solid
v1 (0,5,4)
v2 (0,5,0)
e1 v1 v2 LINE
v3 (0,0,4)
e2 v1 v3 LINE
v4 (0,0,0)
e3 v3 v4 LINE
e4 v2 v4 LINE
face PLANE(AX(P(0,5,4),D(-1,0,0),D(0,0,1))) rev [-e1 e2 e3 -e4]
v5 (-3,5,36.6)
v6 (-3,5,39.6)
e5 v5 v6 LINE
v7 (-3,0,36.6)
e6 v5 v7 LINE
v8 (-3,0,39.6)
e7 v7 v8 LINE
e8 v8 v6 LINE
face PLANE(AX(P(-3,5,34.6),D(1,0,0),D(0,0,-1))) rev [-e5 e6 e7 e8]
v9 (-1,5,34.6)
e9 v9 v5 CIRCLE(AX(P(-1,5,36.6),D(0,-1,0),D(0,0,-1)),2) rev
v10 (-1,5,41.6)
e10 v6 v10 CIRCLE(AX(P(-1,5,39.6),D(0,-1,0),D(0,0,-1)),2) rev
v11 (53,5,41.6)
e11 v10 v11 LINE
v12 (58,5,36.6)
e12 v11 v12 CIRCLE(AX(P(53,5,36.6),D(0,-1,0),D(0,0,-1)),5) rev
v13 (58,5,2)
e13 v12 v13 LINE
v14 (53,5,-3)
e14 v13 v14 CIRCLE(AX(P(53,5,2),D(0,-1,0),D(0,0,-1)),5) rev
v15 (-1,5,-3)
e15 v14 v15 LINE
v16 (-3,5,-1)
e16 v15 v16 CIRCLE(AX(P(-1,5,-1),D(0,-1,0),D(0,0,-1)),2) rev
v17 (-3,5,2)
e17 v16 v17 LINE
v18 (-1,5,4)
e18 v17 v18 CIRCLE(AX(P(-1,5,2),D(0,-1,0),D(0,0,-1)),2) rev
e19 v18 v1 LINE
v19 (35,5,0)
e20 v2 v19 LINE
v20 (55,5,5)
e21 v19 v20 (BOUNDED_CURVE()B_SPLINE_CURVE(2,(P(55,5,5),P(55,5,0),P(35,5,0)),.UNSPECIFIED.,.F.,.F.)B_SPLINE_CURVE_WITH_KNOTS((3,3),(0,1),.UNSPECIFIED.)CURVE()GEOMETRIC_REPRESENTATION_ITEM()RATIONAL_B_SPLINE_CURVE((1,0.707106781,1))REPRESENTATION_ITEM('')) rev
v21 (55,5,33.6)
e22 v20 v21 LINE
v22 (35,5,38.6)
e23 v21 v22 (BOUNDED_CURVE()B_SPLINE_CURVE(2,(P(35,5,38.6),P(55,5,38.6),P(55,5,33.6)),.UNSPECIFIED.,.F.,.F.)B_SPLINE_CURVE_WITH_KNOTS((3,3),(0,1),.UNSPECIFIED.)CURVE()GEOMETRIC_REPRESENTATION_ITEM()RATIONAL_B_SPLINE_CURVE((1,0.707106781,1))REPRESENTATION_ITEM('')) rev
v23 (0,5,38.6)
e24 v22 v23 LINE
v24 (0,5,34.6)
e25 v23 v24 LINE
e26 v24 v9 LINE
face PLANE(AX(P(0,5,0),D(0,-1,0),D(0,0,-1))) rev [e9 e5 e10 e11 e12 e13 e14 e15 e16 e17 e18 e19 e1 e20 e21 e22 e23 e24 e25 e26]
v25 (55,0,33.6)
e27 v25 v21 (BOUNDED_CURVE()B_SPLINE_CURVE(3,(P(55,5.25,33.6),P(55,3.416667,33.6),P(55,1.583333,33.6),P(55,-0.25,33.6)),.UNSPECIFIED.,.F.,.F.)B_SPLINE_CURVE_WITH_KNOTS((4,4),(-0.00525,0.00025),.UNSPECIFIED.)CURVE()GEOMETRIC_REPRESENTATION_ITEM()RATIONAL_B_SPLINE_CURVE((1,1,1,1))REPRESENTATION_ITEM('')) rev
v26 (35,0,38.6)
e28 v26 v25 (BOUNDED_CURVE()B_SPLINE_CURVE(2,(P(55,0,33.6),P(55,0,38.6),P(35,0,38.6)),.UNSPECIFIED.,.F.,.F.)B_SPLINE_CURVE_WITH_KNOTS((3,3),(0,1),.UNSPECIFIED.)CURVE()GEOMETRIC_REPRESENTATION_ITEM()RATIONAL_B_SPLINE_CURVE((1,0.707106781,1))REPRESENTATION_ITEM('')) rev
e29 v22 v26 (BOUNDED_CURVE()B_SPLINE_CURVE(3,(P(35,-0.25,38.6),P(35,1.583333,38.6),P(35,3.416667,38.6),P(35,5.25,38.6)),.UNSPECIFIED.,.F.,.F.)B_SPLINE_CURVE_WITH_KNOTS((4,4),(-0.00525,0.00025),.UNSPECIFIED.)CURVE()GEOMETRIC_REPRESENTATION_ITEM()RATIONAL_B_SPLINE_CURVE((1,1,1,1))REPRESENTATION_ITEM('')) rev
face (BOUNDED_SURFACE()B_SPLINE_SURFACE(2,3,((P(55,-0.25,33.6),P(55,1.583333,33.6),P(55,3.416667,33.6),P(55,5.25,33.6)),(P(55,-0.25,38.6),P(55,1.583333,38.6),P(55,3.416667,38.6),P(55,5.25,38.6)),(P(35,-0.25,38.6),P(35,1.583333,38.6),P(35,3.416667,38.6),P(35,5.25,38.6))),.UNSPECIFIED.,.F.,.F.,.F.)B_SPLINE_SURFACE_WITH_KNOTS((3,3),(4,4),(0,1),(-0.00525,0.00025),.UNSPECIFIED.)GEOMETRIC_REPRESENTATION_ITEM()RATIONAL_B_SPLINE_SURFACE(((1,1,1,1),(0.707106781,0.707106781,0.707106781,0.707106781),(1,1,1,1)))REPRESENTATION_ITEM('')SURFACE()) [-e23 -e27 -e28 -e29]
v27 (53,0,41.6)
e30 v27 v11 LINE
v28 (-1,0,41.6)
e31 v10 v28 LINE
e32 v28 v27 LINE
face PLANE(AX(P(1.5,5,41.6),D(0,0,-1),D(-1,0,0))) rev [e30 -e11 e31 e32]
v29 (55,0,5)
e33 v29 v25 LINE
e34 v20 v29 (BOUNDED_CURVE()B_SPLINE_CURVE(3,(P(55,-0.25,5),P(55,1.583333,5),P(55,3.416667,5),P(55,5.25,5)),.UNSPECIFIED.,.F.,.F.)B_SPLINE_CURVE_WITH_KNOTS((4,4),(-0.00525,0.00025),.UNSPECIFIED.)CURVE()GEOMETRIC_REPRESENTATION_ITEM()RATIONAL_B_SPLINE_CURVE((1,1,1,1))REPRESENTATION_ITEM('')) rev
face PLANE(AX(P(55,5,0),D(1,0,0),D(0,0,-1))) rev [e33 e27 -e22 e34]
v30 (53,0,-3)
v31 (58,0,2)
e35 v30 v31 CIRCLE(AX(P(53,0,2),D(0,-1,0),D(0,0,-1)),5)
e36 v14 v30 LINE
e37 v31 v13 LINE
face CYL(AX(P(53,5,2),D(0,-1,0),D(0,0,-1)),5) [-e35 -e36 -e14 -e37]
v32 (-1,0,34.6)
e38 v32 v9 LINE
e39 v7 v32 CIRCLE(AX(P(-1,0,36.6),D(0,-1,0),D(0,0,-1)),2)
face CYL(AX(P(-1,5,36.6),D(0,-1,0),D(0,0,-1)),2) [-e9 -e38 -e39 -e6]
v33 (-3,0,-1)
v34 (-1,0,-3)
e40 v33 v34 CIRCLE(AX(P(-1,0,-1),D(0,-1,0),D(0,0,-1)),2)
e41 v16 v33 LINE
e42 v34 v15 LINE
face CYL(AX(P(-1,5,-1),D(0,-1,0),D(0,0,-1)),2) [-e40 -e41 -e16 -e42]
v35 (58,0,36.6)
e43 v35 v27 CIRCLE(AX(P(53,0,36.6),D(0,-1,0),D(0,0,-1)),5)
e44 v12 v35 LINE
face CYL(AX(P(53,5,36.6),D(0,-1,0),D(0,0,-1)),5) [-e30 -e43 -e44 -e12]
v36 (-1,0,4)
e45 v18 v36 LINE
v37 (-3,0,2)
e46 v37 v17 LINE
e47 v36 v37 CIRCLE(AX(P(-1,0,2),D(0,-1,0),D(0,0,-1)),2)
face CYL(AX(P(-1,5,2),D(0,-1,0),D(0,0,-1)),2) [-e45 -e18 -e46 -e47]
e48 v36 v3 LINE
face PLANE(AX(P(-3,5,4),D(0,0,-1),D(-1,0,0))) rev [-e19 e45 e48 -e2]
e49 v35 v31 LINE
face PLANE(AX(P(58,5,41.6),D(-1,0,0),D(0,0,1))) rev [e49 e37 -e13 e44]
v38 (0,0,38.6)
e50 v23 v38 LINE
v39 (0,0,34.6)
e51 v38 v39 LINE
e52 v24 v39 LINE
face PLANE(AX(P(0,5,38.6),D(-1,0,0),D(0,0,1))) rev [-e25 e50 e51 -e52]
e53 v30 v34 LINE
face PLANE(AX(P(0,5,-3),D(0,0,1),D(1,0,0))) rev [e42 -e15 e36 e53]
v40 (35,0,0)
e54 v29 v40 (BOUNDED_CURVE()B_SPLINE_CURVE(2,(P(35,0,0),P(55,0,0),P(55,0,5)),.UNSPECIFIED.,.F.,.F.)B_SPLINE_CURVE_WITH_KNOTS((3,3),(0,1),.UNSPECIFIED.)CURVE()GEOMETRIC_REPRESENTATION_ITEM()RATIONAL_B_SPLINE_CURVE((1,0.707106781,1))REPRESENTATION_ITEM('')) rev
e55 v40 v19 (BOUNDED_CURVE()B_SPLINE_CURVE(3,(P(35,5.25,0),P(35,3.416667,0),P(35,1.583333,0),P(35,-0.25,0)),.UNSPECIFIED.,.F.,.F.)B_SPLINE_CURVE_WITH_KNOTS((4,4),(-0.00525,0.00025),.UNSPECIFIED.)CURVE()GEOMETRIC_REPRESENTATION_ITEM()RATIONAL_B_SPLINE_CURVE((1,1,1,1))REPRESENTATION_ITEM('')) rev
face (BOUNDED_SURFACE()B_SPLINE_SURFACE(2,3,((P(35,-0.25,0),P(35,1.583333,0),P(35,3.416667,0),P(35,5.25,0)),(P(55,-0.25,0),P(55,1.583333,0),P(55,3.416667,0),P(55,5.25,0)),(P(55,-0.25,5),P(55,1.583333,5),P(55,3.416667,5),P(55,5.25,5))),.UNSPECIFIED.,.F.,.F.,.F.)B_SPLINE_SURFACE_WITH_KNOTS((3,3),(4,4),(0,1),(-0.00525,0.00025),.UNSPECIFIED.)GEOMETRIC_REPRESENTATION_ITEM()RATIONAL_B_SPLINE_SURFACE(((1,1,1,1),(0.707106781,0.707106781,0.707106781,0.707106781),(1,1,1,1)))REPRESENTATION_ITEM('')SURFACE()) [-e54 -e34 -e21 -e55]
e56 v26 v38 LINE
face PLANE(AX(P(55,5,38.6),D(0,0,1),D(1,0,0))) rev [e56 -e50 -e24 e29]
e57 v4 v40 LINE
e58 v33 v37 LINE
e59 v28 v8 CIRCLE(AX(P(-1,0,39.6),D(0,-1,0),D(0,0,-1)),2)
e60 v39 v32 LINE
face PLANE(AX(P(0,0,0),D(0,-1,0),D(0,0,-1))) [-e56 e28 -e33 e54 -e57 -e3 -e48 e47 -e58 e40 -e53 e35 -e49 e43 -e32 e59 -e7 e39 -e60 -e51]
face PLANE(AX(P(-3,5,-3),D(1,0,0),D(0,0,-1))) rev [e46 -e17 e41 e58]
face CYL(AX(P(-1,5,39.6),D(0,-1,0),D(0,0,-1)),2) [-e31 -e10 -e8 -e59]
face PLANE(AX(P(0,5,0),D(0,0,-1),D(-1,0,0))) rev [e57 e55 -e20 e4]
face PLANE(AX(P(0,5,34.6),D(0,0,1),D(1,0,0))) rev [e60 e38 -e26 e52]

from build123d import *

# Parameters (mm, degrees)
BOSS_EXTRUDE1_DEPTH = 5
FILLET1_SIZE        = 20
FILLET1_SIZE_2      = 5
FILLET2_R           = 2
FILLET3_R           = 5


with BuildPart() as part:
    # Sketch1 → Boss-Extrude1 (new body)
    with BuildSketch(Plane(origin=(0, 0, 0), x_dir=(1, 0, 0), z_dir=(0, 1, 0))):
        Polygon((0, 0), (55, 0), (55, -38.6), (0, -38.6), (0, -34.6), (-3, -34.6), (-3, -41.6), (1.5, -41.6), (58, -41.6), (58, 3), (0, 3), (-3, 3), (-3, -4), (0, -4), align=None)
    extrude(amount=BOSS_EXTRUDE1_DEPTH)

    # Fillet1
    # an asymmetric fillet: 20, 5 mm, written as the material it adds along each edge
    with BuildSketch(Plane(origin=(55, 0, 0), x_dir=(-1, 0, 0), z_dir=(0, 1, 0))) as fillet1_piece_1:
        with BuildLine():
            Bezier((FILLET1_SIZE, 0), (0, 0), (0, FILLET1_SIZE_2), weights=[1, 0.707106781, 1])
            Line((0, FILLET1_SIZE_2), (0, 0))
            Line((0, 0), (FILLET1_SIZE, 0))
        make_face()
    extrude(amount=5)
    with BuildSketch(Plane(origin=(55, 0, 38.6), x_dir=(-1, 0, 0), z_dir=(0, 1, 0))) as fillet1_piece_2:
        with BuildLine():
            Bezier((FILLET1_SIZE, 0), (0, 0), (0, -FILLET1_SIZE_2), weights=[1, 0.707106781, 1])
            Line((0, -FILLET1_SIZE_2), (0, 0))
            Line((0, 0), (FILLET1_SIZE, 0))
        make_face()
    extrude(amount=5)

    # Fillet2
    fillet2_edges = [part.edges().sort_by_distance(p)[0] for p in [
        (-3, 2.5, 4),
        (-3, 2.5, -3),
        (-3, 2.5, 41.6),
        (-3, 2.5, 34.6),
    ]]
    fillet(fillet2_edges, radius=FILLET2_R)

    # Fillet3
    fillet3_edges = [part.edges().sort_by_distance(p)[0] for p in [
        (58, 2.5, -3),
        (58, 2.5, 41.6),
    ]]
    fillet(fillet3_edges, radius=FILLET3_R)


solid = part.part
